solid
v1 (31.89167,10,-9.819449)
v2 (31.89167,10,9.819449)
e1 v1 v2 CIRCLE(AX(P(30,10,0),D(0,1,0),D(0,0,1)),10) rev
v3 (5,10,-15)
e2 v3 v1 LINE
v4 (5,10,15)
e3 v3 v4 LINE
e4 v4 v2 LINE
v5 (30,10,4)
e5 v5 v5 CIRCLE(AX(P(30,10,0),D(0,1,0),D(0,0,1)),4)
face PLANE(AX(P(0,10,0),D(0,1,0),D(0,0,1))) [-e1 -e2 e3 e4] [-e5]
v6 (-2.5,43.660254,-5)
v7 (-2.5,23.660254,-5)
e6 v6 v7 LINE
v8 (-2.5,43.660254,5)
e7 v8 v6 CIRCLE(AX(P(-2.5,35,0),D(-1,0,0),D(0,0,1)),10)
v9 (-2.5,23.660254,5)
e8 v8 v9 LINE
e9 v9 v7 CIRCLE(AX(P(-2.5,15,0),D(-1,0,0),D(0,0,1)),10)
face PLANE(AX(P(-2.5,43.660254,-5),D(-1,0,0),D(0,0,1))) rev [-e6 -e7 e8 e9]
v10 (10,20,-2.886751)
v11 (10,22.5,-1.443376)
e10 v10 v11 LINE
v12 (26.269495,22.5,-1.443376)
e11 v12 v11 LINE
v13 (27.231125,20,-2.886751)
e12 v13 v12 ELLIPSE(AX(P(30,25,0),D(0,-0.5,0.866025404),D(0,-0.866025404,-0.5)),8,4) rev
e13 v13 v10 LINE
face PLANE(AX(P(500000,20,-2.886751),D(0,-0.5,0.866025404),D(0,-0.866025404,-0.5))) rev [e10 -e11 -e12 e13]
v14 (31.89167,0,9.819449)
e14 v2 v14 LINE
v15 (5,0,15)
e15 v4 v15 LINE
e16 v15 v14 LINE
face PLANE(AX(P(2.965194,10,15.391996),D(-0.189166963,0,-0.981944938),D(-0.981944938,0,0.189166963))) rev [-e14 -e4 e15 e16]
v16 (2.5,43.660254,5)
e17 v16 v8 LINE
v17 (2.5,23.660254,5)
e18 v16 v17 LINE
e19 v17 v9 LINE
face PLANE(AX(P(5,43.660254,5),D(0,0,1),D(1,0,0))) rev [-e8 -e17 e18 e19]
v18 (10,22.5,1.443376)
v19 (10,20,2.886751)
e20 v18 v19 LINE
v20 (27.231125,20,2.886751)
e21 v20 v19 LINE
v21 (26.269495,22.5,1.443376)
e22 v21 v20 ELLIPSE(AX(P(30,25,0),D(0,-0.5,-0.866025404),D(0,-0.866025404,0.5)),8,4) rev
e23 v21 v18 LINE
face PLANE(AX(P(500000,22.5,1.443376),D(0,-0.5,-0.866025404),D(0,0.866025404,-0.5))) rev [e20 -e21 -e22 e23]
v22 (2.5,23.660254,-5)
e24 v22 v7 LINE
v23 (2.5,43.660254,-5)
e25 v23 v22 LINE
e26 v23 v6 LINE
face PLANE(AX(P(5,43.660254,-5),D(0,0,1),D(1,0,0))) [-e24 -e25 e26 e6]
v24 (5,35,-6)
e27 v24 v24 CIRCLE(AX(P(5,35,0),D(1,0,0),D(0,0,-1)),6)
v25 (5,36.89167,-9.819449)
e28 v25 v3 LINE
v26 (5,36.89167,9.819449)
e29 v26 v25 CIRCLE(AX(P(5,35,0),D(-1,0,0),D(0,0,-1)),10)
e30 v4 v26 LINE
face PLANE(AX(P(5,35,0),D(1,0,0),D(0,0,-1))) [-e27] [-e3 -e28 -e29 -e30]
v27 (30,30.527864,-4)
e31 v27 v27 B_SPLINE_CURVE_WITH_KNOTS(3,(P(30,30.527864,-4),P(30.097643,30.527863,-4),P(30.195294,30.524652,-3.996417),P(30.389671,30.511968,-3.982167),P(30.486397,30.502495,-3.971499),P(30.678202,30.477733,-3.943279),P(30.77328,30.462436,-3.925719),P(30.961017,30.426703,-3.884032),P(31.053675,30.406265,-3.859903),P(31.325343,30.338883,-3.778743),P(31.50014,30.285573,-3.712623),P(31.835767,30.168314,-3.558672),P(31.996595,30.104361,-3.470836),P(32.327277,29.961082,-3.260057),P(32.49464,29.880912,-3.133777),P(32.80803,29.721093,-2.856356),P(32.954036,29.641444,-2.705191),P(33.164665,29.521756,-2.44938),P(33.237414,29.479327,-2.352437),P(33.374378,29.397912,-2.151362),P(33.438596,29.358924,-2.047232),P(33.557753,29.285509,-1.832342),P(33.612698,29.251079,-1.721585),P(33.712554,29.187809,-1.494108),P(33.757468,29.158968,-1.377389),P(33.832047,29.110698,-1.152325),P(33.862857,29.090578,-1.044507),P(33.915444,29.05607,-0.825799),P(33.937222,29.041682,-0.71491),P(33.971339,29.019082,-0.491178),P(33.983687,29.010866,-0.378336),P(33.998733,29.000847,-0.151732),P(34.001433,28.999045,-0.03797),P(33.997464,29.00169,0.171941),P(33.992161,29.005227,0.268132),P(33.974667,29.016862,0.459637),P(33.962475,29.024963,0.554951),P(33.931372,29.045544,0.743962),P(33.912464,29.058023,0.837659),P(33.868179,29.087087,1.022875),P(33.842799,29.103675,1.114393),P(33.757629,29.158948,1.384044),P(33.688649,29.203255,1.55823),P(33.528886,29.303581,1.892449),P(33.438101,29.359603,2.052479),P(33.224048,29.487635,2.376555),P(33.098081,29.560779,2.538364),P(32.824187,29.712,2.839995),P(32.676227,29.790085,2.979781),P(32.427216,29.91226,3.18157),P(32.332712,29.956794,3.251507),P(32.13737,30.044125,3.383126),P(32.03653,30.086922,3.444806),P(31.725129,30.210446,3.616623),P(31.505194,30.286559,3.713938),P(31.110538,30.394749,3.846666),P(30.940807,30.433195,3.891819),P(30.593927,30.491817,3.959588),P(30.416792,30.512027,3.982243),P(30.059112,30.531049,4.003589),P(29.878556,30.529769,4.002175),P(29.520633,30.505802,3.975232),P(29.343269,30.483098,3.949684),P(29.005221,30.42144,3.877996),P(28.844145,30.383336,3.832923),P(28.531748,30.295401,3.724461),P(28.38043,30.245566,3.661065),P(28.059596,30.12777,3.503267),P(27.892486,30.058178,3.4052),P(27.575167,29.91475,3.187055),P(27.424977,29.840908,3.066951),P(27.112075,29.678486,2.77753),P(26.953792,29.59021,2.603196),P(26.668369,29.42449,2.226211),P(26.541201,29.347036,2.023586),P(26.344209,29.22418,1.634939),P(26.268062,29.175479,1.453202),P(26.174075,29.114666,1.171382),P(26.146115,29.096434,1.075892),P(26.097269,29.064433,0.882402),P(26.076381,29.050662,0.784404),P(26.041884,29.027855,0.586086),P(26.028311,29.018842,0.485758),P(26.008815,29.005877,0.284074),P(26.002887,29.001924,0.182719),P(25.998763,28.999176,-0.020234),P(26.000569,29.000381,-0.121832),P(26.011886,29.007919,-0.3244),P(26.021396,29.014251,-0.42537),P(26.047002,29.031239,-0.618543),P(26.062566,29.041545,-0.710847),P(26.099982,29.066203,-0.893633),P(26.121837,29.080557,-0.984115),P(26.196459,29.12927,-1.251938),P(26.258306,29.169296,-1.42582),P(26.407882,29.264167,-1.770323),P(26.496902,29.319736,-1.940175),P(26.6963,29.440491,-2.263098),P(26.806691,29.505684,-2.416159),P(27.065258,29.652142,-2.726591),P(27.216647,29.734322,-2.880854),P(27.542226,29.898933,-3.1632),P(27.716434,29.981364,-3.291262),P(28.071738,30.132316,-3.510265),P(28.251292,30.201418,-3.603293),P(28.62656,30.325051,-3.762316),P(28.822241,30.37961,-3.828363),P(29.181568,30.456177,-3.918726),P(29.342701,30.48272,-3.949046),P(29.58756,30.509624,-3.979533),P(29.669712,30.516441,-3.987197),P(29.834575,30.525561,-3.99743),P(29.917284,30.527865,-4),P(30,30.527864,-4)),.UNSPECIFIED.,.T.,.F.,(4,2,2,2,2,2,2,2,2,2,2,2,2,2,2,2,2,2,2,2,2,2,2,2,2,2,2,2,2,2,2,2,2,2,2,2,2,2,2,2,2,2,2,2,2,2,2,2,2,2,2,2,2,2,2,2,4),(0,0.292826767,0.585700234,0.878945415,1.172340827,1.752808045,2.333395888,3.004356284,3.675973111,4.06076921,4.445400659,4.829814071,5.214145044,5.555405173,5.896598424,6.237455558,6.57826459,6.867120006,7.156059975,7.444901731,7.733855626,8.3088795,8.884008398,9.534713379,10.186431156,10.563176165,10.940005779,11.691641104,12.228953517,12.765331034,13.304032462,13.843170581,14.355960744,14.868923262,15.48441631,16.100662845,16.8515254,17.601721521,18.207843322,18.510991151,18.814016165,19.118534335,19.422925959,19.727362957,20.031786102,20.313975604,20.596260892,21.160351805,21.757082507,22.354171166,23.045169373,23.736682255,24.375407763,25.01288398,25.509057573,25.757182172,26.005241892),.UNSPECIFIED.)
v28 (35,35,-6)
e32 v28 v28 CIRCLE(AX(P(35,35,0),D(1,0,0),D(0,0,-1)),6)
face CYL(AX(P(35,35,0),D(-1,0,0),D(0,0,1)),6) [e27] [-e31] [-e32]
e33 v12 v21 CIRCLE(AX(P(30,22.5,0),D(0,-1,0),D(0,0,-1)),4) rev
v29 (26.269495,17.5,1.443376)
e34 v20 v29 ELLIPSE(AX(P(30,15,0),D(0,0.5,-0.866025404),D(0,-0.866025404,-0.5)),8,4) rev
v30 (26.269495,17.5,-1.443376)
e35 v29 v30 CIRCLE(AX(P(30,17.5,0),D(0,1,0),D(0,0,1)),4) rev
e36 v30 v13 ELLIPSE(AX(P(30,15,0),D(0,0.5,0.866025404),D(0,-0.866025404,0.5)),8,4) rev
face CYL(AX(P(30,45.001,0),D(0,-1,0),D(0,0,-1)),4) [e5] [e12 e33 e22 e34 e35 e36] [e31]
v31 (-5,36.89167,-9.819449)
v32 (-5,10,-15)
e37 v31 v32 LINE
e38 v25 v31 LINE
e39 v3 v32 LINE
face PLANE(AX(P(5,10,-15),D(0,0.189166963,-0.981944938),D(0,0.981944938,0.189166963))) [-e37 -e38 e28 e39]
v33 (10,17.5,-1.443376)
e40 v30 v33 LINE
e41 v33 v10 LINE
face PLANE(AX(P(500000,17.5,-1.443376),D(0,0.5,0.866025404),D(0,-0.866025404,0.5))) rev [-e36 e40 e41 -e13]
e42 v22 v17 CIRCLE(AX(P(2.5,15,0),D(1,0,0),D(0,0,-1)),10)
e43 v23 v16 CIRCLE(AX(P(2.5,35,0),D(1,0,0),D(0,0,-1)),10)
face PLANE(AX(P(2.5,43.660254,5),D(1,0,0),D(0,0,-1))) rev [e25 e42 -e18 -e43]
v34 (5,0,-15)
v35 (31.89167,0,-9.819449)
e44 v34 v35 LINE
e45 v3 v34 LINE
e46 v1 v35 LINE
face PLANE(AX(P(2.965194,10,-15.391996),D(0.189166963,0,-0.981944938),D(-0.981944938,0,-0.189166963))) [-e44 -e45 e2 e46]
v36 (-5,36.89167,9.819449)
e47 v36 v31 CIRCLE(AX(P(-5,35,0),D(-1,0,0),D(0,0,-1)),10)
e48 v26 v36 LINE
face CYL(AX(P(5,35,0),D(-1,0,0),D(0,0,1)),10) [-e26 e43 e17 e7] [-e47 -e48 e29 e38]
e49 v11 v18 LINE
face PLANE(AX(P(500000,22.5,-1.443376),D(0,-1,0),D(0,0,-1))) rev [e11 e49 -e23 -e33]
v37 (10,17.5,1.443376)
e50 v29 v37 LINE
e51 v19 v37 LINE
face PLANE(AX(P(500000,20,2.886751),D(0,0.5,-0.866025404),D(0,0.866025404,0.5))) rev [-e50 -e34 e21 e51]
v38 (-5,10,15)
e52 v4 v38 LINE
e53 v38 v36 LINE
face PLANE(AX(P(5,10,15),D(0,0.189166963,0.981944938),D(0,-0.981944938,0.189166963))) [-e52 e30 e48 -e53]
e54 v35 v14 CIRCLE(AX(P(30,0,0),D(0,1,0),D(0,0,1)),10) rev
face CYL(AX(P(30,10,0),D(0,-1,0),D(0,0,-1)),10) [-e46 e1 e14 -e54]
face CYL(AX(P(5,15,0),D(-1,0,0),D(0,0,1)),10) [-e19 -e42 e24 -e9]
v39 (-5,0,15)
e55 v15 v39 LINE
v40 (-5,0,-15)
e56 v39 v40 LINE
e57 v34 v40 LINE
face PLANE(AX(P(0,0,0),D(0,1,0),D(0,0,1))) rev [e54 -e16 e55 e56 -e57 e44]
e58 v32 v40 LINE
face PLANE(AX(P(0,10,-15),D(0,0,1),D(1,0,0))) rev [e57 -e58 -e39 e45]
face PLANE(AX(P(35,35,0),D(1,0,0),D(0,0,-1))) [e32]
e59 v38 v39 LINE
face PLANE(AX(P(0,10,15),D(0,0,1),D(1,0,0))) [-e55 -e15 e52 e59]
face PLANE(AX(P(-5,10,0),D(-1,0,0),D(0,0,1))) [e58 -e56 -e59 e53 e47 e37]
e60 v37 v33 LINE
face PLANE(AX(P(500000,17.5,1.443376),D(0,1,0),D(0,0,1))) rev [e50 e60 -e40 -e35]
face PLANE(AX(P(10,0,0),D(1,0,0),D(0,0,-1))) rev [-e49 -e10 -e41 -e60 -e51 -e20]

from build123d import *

# Parameters (mm, degrees)
SKETCH1_W                = 10
SKETCH1_H                = 30
BOSS_EXTRUDE1_DEPTH      = 10
BOSS_EXTRUDE2_DEPTH      = 10
SKETCH4_R                = 6
BOSS_EXTRUDE3_DEPTH      = 30
BOSS_EXTRUDE4_REACH      = 57.227
BOSS_EXTRUDE4_END_RADIUS = 6
SKETCH5_R                = 4
BOSS_EXTRUDE5_REACH      = 60.949
BOSS_EXTRUDE5_END_RADIUS = 4
SKETCH7_W                = 9.610963381
SKETCH7_H                = 7.741253353
CUT_EXTRUDE1_DEPTH       = 5
CUT_EXTRUDE2_START       = -2.5
CUT_EXTRUDE2_DEPTH       = 5


# Read off the part's stored shape, not the designer's step: Cut-Extrude2
with BuildPart() as part:
    # Sketch1 → Boss-Extrude1 (new body)
    with BuildSketch(Plane(origin=(0, 0, 0), x_dir=(1, 0, 0), z_dir=(0, 1, 0))):
        Rectangle(SKETCH1_W, SKETCH1_H)
        with BuildLine():
            ThreePointArc((31.891669625, 9.819449375), (40, 0), (31.891669625, -9.819449375))
            Line((31.891669625, -9.819449375), (5, -15))
            Line((5, -15), (5, 15))
            Line((5, 15), (31.891669625, 9.819449375))
        make_face()
    extrude(amount=BOSS_EXTRUDE1_DEPTH)

    # Sketch2 → Boss-Extrude2 (add)
    with BuildSketch(Plane.ZY.offset(5)):
        with BuildLine():
            Line((-15, 10), (-9.819449375, 36.891669625))
            ThreePointArc((-9.819449375, 36.891669625), (0, 45), (9.819449375, 36.891669625))
            Line((9.819449375, 36.891669625), (15, 10))
            Line((15, 10), (-15, 10))
        make_face()
    extrude(amount=-BOSS_EXTRUDE2_DEPTH)

    # Sketch4 → Boss-Extrude3 (add)
    with BuildSketch(Plane(origin=(5, 0, 0), x_dir=(0, 0, -1), z_dir=(1, 0, 0))):
        with Locations((0, 35)):
            Circle(SKETCH4_R)
    extrude(amount=BOSS_EXTRUDE3_DEPTH)

    # Boss-Extrude4: up to this cylinder (the profile starts outside it)
    boss_extrude4_end = Plane(origin=(30, 35, 0), z_dir=(-1, 0, 0)) * Cylinder(BOSS_EXTRUDE4_END_RADIUS, 127.454, mode=Mode.PRIVATE)
    # Sketch5 → Boss-Extrude4 (add, up to the surface)
    with BuildSketch(Plane(origin=(0, 10, 0), x_dir=(1, 0, 0), z_dir=(0, 1, 0)), mode=Mode.PRIVATE) as boss_extrude4_sk1:
        with Locations(Location((30, 0, 0), (0, 0, 90))):
            Circle(SKETCH5_R)
    boss_extrude4_tool1 = extrude(boss_extrude4_sk1.sketch, amount=BOSS_EXTRUDE4_REACH, mode=Mode.PRIVATE) - boss_extrude4_end
    add(boss_extrude4_tool1.solids().sort_by_distance((30, 10, 0))[0])

    # Boss-Extrude5: up to this cylinder (the profile starts outside it)
    boss_extrude5_end = Plane(origin=(30, 20, 0), z_dir=(0, -1, 0)) * Cylinder(BOSS_EXTRUDE5_END_RADIUS, 130.898, mode=Mode.PRIVATE)
    # Sketch6 → Boss-Extrude5 (add, up to the surface)
    with BuildSketch(Plane(origin=(5, 0, 0), x_dir=(0, 0, -1), z_dir=(1, 0, 0)), mode=Mode.PRIVATE) as boss_extrude5_sk1:
        Polygon((-1.443375673, 22.5), (-2.886751346, 20), (-1.443375673, 17.5), (1.443375673, 17.5), (2.886751346, 20), (1.443375673, 22.5), align=None)
    boss_extrude5_tool1 = extrude(boss_extrude5_sk1.sketch, amount=BOSS_EXTRUDE5_REACH, mode=Mode.PRIVATE) - boss_extrude5_end
    add(boss_extrude5_tool1.solids().sort_by_distance((5, 20, 0))[0])

    # Sketch7 → Cut-Extrude1 (cut)
    with BuildSketch(Plane(origin=(5, 0, 0), x_dir=(0, 0, -1), z_dir=(1, 0, 0))):
        with Locations((0.16655936, 19.575208137)):
            Rectangle(SKETCH7_W, SKETCH7_H)
    extrude(amount=CUT_EXTRUDE1_DEPTH, mode=Mode.SUBTRACT)

    # Cut-Extrude2 outline → Cut-Extrude2 (cut)
    with BuildSketch(Plane.YZ.offset(CUT_EXTRUDE2_START)):
        with BuildLine():
            Line((43.660254038, 5), (23.660254038, 5))
            ThreePointArc((23.660254038, 5), (25, 0), (23.660254038, -5))
            Line((23.660254038, -5), (43.660254038, -5))
            ThreePointArc((43.660254038, -5), (45, 0), (43.660254038, 5))
        make_face()
    extrude(amount=CUT_EXTRUDE2_DEPTH, mode=Mode.SUBTRACT)


solid = part.part
